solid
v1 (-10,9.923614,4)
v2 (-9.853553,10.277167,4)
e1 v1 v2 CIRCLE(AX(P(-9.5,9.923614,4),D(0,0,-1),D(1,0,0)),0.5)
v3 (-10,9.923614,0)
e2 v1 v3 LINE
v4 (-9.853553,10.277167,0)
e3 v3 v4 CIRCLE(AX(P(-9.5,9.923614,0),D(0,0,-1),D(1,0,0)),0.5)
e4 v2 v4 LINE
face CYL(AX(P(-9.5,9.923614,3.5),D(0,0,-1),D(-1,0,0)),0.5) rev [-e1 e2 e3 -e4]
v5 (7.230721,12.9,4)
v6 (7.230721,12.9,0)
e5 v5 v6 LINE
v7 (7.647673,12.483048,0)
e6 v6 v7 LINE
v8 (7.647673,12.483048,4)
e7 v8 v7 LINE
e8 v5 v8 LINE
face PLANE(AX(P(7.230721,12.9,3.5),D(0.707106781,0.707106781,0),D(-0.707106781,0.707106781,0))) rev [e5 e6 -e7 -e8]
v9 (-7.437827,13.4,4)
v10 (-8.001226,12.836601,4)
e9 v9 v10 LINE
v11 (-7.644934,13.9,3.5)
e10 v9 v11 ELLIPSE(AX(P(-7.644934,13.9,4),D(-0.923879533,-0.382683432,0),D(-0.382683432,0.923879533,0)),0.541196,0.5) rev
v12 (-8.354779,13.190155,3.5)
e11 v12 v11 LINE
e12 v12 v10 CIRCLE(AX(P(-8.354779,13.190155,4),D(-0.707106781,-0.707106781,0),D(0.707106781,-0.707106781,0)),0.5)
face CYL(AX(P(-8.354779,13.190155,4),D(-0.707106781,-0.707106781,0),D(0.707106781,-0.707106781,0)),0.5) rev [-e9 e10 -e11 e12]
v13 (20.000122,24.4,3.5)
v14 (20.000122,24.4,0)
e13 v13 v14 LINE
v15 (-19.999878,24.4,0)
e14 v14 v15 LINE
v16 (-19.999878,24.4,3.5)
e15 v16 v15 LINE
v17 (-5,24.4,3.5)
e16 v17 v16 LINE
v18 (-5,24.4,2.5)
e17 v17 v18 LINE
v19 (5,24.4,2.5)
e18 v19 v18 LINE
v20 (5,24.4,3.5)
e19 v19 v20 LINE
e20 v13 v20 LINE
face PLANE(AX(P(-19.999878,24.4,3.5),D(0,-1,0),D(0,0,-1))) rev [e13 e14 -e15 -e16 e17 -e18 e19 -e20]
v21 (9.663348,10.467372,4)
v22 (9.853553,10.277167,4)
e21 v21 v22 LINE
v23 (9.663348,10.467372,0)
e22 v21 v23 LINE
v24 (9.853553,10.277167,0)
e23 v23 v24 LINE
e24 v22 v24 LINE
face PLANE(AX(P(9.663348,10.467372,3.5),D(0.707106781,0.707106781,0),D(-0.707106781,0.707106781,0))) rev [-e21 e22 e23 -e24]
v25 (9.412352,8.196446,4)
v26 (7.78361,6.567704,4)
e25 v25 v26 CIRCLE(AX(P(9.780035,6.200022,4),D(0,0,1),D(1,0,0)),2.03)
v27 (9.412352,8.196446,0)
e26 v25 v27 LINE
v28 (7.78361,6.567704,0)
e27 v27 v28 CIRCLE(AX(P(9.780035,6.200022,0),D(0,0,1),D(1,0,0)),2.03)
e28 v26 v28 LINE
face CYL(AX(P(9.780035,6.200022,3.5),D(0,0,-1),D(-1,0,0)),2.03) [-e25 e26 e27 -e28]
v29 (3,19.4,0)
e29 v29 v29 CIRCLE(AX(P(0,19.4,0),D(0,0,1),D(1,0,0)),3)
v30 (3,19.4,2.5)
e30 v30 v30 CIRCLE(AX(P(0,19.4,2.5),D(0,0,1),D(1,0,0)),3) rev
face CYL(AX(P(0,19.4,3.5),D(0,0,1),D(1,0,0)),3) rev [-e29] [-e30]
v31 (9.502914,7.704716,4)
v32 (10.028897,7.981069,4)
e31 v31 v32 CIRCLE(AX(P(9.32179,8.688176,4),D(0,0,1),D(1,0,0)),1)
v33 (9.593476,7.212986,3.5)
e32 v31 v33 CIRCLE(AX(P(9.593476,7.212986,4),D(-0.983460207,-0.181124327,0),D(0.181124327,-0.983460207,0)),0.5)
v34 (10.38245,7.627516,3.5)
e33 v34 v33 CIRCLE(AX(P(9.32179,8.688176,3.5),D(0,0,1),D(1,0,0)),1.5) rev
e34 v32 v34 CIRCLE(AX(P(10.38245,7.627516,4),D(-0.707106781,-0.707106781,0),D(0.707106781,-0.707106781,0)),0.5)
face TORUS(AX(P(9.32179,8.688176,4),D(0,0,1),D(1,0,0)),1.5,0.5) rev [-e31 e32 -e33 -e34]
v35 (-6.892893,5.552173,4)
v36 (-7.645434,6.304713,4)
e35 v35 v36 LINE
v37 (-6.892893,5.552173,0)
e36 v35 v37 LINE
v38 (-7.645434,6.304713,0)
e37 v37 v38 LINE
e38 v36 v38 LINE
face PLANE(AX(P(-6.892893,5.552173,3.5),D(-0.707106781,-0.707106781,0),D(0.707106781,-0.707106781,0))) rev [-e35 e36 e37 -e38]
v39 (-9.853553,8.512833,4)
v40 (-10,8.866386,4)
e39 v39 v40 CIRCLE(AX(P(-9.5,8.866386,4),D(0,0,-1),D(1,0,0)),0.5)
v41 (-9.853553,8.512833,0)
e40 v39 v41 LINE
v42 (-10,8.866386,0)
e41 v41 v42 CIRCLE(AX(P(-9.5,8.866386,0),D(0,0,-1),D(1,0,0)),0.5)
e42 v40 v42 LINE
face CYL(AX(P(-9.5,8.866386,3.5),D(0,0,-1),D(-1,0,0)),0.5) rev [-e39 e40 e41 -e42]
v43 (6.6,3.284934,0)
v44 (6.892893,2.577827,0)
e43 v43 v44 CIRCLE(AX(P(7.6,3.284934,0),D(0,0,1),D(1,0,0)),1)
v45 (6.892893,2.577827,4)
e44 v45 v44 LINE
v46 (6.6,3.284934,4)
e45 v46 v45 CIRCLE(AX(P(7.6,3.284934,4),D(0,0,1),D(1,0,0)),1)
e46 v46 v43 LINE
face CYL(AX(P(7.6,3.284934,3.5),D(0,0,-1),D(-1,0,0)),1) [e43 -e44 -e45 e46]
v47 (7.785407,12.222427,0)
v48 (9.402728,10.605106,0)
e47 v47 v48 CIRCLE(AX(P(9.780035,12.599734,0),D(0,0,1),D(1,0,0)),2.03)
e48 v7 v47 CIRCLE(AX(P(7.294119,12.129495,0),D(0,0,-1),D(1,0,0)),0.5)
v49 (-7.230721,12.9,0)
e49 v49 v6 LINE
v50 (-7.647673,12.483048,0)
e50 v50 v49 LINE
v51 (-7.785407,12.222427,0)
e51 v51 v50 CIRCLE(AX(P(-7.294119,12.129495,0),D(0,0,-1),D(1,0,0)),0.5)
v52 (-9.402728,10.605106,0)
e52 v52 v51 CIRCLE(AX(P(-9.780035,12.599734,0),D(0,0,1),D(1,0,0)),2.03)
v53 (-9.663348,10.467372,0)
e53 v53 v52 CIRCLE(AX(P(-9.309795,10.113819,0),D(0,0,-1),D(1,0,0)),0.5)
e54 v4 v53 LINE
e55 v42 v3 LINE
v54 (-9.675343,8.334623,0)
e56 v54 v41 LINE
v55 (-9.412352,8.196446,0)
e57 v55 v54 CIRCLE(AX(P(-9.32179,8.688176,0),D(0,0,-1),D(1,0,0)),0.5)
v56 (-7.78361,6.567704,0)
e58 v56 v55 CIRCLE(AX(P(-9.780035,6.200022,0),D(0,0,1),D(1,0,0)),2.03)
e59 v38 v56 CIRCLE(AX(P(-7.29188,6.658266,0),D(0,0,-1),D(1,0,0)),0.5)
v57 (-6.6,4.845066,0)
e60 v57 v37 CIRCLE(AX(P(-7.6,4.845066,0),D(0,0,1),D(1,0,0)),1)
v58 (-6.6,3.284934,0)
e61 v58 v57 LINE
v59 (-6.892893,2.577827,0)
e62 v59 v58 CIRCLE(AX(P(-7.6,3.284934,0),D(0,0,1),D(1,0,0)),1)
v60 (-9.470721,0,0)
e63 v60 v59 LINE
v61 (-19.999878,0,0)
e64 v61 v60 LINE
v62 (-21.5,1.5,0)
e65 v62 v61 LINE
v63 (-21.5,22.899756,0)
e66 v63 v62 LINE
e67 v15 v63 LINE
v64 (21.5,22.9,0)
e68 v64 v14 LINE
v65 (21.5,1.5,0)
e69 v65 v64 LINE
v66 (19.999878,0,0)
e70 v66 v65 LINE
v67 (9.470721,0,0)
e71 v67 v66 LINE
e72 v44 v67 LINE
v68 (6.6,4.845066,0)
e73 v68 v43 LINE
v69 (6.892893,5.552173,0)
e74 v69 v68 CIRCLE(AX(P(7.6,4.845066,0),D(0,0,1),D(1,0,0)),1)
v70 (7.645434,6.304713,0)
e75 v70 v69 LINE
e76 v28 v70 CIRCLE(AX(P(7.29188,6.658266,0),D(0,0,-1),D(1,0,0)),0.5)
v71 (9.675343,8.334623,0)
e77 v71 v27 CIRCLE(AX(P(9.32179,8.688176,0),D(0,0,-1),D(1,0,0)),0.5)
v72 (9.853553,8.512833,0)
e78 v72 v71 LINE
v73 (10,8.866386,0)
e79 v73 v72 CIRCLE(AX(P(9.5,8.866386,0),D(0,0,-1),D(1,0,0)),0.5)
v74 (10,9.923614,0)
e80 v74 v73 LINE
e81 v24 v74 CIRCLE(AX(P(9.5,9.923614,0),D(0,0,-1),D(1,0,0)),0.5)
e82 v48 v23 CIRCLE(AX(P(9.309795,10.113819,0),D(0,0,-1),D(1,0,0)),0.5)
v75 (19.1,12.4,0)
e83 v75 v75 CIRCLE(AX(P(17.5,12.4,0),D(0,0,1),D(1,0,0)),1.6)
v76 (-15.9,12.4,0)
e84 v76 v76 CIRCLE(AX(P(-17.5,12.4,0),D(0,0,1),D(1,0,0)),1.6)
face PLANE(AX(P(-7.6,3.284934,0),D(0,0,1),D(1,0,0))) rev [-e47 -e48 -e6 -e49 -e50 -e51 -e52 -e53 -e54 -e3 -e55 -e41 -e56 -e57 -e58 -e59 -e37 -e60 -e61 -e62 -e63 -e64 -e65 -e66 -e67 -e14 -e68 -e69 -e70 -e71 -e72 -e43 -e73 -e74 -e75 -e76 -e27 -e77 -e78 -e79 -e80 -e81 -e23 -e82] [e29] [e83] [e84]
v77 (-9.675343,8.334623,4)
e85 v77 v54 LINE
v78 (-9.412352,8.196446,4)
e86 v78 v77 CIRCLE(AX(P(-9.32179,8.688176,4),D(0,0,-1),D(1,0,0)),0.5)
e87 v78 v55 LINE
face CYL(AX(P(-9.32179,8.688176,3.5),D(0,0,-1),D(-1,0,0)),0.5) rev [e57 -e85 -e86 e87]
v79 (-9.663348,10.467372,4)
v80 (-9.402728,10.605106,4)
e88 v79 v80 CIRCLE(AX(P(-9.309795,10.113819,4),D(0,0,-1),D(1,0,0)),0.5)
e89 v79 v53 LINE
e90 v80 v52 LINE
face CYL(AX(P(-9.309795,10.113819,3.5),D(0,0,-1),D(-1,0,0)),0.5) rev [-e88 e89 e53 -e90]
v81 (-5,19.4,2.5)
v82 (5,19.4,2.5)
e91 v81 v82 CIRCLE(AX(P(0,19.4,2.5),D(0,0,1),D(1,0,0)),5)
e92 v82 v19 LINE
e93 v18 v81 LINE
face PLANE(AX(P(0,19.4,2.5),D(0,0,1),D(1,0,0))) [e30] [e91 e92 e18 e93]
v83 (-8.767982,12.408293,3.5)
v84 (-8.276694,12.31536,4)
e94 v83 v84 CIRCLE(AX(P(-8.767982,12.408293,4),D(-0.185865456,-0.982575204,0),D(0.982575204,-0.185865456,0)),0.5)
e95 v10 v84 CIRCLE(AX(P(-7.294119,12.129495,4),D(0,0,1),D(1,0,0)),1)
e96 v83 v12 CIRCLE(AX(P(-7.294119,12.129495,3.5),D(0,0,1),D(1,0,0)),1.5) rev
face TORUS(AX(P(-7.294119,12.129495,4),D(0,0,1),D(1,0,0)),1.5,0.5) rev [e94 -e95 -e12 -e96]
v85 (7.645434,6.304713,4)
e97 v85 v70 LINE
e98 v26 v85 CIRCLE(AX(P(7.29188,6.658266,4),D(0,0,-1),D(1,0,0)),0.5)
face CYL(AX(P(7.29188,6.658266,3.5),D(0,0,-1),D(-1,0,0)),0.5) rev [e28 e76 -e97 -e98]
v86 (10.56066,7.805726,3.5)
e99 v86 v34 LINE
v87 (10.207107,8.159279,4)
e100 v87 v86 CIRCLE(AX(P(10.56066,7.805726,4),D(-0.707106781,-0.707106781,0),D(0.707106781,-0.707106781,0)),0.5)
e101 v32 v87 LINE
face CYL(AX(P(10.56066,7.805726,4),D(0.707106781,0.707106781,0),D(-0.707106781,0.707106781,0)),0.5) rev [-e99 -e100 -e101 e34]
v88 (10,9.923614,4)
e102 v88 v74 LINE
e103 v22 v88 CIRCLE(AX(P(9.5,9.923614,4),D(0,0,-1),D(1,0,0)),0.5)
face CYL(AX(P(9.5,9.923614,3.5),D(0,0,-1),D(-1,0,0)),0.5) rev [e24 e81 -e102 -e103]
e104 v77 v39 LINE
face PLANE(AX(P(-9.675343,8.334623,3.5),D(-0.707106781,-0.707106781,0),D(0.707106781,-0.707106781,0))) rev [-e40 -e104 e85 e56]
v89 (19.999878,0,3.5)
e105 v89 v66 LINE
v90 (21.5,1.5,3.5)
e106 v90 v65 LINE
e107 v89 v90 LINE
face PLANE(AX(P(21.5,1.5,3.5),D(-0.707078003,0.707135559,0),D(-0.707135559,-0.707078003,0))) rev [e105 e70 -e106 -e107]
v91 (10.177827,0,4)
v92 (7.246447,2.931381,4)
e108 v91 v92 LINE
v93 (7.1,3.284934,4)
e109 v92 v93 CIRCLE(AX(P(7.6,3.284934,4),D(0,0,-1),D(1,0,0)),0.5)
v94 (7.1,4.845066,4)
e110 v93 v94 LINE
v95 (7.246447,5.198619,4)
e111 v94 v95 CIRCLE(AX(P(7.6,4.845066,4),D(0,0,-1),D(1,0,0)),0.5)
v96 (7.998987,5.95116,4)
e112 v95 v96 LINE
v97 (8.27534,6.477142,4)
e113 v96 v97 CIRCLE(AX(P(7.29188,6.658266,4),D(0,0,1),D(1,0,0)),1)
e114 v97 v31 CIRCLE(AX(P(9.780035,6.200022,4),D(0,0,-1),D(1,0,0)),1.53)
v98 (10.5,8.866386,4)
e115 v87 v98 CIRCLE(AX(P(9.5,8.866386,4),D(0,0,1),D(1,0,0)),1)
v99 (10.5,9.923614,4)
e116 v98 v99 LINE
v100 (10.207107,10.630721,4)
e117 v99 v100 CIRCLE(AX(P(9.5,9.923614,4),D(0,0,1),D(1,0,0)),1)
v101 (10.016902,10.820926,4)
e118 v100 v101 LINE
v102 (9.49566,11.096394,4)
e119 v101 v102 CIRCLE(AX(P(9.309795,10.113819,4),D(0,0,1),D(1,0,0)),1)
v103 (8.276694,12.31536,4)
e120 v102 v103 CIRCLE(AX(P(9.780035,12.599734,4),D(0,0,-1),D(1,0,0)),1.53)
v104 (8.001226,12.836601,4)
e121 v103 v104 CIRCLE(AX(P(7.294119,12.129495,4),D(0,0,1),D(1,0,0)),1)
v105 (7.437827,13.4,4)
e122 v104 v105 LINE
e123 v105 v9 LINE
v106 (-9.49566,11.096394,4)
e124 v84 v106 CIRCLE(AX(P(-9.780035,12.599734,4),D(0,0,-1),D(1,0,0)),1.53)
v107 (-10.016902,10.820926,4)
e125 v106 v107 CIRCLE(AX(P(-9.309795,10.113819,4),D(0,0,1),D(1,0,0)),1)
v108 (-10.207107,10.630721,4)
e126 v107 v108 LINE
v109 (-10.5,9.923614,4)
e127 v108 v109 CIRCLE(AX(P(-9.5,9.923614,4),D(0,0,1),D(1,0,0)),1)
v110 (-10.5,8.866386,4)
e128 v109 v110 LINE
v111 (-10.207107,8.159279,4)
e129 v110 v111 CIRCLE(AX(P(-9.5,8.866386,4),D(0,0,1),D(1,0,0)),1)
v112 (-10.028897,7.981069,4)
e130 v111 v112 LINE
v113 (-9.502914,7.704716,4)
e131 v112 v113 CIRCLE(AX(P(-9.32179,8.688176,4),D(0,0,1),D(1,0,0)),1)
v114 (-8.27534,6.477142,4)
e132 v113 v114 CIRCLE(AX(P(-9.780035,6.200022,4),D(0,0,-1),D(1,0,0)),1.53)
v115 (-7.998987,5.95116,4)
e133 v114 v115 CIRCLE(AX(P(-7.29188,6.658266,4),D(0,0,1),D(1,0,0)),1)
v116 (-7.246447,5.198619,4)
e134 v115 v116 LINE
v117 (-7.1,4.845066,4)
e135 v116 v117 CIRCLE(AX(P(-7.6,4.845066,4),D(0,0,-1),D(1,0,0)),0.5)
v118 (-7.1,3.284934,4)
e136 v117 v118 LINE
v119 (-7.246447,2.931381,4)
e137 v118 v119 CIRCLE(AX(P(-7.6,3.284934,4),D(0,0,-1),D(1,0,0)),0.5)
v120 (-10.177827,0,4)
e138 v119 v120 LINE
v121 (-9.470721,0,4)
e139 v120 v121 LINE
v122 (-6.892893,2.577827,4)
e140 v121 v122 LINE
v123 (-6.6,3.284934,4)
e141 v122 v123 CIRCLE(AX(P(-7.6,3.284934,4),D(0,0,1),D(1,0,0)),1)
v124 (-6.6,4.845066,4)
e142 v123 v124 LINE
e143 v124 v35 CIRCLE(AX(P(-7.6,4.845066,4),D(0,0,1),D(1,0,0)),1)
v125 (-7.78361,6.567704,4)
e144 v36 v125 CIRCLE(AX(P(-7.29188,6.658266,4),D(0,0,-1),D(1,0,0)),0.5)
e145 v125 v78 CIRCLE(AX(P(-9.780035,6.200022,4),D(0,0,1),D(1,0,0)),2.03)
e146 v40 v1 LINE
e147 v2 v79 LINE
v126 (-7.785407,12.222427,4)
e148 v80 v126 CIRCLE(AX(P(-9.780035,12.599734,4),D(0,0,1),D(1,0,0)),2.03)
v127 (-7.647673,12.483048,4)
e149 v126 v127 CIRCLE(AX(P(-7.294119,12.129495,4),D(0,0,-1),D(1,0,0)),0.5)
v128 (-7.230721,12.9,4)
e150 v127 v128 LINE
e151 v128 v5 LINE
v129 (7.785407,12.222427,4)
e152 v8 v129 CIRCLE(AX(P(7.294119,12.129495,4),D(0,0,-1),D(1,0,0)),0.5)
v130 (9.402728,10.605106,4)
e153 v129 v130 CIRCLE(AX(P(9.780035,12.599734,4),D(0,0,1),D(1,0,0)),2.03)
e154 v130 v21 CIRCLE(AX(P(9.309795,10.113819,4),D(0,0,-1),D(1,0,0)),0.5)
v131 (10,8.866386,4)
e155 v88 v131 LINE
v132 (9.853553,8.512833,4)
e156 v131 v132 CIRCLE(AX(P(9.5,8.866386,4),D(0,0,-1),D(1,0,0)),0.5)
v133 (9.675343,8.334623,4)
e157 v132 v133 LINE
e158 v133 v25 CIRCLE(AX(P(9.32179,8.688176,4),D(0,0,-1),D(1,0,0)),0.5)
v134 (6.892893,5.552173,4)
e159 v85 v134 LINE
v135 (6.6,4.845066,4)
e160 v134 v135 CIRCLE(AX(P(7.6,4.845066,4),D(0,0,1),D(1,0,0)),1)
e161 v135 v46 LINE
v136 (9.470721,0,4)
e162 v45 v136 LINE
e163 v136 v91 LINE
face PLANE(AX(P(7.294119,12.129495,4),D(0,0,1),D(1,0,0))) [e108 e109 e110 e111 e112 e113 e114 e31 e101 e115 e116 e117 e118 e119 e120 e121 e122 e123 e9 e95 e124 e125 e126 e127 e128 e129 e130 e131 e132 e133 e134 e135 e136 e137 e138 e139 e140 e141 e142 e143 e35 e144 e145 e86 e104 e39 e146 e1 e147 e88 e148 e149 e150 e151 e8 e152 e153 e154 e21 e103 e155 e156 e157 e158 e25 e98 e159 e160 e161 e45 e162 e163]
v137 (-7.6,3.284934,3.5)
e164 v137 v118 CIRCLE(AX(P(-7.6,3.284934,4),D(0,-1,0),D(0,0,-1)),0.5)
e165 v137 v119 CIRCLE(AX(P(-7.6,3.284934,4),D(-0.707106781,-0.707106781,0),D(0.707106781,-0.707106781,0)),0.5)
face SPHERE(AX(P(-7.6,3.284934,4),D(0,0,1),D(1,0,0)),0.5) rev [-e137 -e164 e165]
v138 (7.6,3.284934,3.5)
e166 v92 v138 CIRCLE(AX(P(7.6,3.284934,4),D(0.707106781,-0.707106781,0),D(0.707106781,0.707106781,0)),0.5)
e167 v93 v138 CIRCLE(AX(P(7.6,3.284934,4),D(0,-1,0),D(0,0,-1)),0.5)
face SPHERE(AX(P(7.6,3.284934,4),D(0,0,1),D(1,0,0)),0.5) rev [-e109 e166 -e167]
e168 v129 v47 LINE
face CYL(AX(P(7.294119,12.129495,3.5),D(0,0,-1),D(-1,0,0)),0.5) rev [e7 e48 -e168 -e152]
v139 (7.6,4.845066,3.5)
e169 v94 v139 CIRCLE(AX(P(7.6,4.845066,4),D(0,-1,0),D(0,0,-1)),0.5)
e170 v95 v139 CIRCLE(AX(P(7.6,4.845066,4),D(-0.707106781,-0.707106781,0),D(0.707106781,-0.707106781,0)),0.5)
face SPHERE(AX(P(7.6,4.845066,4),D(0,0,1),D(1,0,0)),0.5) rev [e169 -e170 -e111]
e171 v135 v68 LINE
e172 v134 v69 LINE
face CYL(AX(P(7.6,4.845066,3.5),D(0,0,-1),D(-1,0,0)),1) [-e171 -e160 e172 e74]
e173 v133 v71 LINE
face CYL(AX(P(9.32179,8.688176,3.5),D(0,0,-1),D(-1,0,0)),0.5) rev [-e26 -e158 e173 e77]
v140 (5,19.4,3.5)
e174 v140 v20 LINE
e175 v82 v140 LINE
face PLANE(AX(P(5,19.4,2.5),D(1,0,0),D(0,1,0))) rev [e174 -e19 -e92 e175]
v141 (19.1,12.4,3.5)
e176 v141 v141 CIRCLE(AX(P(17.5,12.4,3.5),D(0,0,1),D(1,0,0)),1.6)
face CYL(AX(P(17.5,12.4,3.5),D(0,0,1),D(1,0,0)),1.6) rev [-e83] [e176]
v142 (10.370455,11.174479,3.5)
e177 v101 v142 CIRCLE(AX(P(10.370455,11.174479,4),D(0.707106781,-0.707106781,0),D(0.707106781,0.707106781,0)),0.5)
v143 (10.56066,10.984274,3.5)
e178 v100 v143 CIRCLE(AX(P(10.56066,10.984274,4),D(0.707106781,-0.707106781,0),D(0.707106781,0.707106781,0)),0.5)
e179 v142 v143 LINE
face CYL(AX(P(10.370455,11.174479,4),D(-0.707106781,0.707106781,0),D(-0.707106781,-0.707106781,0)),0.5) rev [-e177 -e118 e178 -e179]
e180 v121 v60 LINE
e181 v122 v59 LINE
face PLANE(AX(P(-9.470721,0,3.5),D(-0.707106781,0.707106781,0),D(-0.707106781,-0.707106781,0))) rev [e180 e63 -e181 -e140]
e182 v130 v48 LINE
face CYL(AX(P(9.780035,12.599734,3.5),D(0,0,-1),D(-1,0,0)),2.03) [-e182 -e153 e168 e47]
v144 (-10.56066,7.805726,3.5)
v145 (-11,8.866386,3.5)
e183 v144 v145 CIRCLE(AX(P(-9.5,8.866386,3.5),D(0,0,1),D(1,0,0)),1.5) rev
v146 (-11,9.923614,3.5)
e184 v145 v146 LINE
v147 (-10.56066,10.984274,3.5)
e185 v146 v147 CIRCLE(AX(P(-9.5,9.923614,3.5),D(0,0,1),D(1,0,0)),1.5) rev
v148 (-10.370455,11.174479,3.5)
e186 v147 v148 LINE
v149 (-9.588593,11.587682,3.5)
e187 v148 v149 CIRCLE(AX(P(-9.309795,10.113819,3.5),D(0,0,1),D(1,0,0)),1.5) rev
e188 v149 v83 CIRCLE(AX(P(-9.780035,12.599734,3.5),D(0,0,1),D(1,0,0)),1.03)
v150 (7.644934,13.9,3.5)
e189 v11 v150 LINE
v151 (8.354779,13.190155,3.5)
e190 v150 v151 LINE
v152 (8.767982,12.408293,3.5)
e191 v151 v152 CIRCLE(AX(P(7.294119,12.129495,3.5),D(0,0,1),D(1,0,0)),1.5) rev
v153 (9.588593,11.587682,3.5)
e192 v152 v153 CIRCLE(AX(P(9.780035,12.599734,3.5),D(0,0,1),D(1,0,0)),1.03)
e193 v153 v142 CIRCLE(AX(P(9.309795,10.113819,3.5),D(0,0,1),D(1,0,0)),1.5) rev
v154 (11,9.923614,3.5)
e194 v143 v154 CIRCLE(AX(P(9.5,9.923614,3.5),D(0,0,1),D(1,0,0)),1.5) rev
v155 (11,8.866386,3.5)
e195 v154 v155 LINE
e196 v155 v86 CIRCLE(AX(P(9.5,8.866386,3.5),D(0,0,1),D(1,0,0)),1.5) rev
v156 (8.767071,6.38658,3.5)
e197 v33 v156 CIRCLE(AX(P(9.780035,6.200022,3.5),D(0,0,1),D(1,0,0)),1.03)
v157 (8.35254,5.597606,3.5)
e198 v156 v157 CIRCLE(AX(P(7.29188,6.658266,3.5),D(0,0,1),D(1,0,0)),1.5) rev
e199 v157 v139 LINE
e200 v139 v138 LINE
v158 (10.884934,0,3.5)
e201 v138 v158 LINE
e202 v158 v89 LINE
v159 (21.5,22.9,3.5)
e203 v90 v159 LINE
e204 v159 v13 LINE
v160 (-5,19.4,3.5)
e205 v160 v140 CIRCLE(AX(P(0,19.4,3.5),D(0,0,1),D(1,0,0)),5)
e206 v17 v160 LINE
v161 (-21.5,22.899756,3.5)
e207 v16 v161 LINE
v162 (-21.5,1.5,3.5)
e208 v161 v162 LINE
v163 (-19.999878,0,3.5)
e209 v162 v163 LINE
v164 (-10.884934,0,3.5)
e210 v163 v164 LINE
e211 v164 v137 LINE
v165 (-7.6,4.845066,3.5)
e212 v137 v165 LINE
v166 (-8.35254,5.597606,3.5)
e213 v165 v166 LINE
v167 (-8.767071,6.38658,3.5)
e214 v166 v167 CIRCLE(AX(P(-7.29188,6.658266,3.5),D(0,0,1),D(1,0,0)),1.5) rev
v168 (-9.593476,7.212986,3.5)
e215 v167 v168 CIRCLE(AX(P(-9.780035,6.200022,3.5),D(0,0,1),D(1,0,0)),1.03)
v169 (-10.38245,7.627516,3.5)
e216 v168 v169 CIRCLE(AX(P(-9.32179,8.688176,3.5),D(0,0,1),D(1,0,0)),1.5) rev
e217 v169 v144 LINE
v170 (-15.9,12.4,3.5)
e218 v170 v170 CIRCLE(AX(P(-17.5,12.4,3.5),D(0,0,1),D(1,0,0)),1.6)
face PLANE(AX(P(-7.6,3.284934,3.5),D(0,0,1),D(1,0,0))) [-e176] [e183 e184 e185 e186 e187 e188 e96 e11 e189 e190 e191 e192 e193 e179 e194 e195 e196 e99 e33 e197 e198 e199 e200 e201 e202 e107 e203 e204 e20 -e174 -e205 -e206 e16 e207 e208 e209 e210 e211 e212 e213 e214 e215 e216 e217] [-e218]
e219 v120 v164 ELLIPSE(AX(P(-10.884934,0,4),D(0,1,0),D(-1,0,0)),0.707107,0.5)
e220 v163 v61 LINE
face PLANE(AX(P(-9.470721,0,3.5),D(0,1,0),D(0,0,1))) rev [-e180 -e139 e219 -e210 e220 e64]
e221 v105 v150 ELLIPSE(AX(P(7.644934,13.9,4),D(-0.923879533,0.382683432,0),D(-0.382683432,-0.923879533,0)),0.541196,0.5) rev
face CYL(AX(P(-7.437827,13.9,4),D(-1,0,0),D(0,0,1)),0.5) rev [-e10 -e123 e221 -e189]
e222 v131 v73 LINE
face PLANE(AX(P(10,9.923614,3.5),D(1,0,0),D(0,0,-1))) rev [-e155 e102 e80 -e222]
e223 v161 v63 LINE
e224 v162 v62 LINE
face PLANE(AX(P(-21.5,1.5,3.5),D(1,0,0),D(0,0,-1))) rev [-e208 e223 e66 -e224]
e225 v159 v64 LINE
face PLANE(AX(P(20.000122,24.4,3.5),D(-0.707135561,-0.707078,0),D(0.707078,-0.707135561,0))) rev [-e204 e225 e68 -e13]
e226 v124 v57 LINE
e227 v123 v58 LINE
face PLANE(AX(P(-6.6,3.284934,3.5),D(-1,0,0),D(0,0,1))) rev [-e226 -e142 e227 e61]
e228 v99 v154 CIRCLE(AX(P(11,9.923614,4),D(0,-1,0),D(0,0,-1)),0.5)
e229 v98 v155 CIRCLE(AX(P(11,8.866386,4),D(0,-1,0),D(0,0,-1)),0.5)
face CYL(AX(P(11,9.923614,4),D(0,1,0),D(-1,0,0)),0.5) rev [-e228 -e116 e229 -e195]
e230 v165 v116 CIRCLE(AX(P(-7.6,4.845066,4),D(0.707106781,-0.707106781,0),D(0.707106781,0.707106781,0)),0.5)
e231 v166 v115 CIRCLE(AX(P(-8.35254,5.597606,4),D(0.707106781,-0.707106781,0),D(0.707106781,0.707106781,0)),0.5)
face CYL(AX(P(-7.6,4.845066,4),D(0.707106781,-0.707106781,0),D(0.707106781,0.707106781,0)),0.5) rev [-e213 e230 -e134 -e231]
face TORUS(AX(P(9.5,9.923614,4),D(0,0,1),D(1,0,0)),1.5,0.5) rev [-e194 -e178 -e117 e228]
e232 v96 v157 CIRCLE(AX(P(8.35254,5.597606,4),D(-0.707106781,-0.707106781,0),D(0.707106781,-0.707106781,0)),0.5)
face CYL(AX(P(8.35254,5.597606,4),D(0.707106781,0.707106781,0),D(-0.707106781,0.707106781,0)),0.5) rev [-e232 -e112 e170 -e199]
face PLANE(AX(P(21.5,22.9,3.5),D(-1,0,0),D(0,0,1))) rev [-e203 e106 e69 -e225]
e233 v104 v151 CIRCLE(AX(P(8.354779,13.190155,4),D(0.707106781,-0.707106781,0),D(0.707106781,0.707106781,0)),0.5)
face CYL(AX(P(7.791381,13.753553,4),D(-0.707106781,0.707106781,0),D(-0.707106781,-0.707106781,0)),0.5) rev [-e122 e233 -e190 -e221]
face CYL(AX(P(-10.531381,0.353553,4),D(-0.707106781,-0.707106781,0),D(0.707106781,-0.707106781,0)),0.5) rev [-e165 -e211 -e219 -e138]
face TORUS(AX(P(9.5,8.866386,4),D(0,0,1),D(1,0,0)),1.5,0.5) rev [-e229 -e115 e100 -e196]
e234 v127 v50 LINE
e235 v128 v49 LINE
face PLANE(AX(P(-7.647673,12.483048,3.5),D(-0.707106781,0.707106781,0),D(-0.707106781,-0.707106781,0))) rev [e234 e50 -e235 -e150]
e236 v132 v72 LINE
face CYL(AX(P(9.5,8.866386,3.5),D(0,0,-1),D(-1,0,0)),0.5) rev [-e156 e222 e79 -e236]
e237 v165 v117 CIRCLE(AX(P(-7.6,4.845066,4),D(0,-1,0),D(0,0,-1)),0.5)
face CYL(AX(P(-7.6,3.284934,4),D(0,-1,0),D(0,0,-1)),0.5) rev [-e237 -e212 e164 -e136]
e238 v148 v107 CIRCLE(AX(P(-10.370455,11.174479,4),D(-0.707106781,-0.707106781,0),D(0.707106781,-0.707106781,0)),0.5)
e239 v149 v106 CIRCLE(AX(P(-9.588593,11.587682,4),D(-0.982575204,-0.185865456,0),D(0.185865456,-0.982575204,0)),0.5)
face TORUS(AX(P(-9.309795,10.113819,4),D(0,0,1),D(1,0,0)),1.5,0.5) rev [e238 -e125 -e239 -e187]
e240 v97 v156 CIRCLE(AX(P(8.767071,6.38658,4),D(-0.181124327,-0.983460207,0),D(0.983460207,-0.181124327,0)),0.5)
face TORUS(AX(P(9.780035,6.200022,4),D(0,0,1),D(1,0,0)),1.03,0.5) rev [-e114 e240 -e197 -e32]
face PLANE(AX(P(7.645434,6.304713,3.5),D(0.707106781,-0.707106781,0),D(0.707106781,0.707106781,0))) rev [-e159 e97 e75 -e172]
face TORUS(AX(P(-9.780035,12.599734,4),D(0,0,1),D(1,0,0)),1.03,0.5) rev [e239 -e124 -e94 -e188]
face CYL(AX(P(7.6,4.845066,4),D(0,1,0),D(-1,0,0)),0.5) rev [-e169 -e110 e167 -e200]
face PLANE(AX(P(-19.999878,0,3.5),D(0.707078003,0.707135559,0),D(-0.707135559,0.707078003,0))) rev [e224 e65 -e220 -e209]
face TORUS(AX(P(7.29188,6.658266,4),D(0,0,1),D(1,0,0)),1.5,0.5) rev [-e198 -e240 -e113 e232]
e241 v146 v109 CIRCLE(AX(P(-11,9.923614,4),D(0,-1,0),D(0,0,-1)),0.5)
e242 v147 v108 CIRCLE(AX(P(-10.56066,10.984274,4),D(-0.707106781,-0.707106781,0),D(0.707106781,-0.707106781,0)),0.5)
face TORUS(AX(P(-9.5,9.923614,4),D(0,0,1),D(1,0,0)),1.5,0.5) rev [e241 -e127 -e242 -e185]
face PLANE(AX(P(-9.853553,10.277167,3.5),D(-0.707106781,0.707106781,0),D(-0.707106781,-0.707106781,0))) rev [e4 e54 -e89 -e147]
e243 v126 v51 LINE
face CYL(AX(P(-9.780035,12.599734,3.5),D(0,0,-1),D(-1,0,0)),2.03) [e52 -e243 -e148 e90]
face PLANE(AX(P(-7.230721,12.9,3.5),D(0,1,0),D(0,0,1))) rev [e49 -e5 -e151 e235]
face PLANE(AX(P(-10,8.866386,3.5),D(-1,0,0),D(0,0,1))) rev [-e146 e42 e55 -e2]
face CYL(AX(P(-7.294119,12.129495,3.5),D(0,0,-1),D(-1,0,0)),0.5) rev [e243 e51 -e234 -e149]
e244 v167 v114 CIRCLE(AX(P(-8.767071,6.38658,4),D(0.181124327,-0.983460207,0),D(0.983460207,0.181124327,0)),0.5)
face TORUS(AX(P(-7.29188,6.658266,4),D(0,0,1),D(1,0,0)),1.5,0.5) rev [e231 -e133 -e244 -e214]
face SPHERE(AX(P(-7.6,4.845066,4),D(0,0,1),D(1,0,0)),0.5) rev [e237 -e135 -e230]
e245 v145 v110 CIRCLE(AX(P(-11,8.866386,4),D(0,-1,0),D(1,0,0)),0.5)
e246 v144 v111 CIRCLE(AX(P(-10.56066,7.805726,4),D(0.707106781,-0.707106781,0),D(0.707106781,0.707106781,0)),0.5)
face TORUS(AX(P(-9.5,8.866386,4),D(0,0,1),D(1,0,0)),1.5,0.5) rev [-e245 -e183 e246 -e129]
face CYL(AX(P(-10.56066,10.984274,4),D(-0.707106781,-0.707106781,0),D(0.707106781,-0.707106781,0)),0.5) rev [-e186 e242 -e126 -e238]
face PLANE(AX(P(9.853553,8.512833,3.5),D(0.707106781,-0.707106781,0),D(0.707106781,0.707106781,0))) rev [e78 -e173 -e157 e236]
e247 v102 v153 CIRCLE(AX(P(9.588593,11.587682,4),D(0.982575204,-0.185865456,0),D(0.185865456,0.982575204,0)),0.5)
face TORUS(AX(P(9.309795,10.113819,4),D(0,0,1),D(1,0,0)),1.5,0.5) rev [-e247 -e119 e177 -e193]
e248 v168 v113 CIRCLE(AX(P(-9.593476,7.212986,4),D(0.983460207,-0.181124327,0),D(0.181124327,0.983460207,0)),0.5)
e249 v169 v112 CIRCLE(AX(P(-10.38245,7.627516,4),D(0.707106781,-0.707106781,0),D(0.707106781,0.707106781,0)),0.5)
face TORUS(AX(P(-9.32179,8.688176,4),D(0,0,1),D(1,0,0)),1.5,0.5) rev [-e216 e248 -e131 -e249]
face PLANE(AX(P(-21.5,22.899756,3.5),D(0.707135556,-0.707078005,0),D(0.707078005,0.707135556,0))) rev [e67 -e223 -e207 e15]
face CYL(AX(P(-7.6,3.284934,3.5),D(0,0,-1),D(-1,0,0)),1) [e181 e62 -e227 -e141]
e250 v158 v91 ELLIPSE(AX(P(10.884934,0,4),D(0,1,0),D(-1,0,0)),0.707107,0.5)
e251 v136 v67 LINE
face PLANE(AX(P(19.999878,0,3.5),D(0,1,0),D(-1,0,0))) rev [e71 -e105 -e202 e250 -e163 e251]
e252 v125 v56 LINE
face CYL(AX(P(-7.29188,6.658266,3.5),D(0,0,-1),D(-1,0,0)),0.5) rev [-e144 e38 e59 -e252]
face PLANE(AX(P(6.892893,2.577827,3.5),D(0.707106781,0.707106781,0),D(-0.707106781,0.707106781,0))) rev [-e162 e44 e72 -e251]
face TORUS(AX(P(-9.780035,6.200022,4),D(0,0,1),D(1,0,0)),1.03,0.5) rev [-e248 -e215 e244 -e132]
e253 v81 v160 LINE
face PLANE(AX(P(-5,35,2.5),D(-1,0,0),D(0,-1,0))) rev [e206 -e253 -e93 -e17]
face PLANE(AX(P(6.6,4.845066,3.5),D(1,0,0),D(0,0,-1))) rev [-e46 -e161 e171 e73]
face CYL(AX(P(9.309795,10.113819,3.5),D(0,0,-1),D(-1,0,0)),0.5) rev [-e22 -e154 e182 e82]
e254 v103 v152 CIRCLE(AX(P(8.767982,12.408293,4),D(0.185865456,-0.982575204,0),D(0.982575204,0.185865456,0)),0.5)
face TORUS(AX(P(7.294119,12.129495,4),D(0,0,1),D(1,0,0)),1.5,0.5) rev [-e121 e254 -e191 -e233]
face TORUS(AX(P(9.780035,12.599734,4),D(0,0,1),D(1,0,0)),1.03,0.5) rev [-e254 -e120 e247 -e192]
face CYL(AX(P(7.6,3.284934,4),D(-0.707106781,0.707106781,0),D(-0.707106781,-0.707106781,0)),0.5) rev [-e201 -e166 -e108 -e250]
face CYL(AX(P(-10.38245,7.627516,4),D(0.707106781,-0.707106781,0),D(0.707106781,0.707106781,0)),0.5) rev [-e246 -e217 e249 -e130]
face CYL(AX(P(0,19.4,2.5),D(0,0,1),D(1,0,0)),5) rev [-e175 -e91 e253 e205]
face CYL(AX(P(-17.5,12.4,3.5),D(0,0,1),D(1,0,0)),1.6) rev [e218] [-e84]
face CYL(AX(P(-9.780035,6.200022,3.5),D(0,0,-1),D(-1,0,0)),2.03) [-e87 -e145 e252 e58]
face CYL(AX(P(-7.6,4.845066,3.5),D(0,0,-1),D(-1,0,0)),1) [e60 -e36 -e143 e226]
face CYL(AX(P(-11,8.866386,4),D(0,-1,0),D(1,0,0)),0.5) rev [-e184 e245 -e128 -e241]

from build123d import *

# Parameters (mm, degrees)
ENDSEAL_1_DEPTH              = 3.5
BOSS_EXTRUDE1_DEPTH          = 0.5
FILLET1_R                    = 0.5
F_6_0_6_DIAMETER_HOLE1_D     = 6
F_6_0_6_DIAMETER_HOLE1_DEPTH = 12.5
F_6_0_6_DIAMETER_HOLE1_TIP   = 1.561701152
CUT_EXTRUDE2_DEPTH           = 1
F_3_2_3_2_DIAMETER_HOLE1_D   = 3.2


with BuildPart() as part:
    # Sketch4 → Endseal 1 (new body)
    with BuildSketch(Plane.XY):
        with BuildLine():
            Line((-7.230720611, 12.9), (7.230720611, 12.9))
            Line((7.230720611, 12.9), (7.647672674, 12.483047938))
            ThreePointArc((7.647672674, 12.483047938), (7.736182466, 12.363118479), (7.785406885, 12.222427275))
            ThreePointArc((7.785406885, 12.222427275), (8.344607784, 11.164307384), (9.402727675, 10.605106485))
            ThreePointArc((9.402727675, 10.605106485), (9.54341888, 10.555882066), (9.663348338, 10.467372274))
            Line((9.663348338, 10.467372274), (9.853553391, 10.277167221))
            ThreePointArc((9.853553391, 10.277167221), (9.961939766, 10.114955546), (10, 9.92361383))
            Line((10, 9.92361383), (10, 8.86638617))
            ThreePointArc((10, 8.86638617), (9.961939766, 8.675044454), (9.853553391, 8.512832779))
            Line((9.853553391, 8.512832779), (9.675343394, 8.334622782))
            ThreePointArc((9.675343394, 8.334622782), (9.554347216, 8.245550888), (9.412352167, 8.19644607))
            ThreePointArc((9.412352167, 8.19644607), (8.344607784, 7.635448616), (7.783610331, 6.567704234))
            ThreePointArc((7.783610331, 6.567704234), (7.734505512, 6.425709184), (7.645433618, 6.304713007))
            Line((7.645433618, 6.304713007), (6.892893219, 5.552172608))
            ThreePointArc((6.892893219, 5.552172608), (6.676120468, 5.227749259), (6.6, 4.845065826))
            Line((6.6, 4.845065826), (6.6, 3.284934173))
            ThreePointArc((6.6, 3.284934173), (6.676120468, 2.902250741), (6.892893219, 2.577827392))
            Line((6.892893219, 2.577827392), (9.470720611, 0))
            Line((9.470720611, 0), (19.9998779, 0))
            Line((19.9998779, 0), (21.5, 1.5))
            Line((21.5, 1.5), (21.5, 22.9))
            Line((21.5, 22.9), (20.0001221, 24.4))
            Line((20.0001221, 24.4), (-19.9998779, 24.4))
            Line((-19.9998779, 24.4), (-21.5, 22.8997558))
            Line((-21.5, 22.8997558), (-21.5, 1.5))
            Line((-21.5, 1.5), (-19.9998779, 0))
            Line((-19.9998779, 0), (-9.470720611, 0))
            Line((-9.470720611, 0), (-6.892893219, 2.577827392))
            ThreePointArc((-6.892893219, 2.577827392), (-6.676120468, 2.902250741), (-6.6, 3.284934173))
            Line((-6.6, 3.284934173), (-6.6, 4.845065826))
            ThreePointArc((-6.6, 4.845065826), (-6.676120468, 5.227749259), (-6.892893219, 5.552172608))
            Line((-6.892893219, 5.552172608), (-7.645433618, 6.304713006))
            ThreePointArc((-7.645433618, 6.304713006), (-7.734505512, 6.425709184), (-7.783610331, 6.567704233))
            ThreePointArc((-7.783610331, 6.567704233), (-8.344607784, 7.635448616), (-9.412352167, 8.19644607))
            ThreePointArc((-9.412352167, 8.19644607), (-9.554347216, 8.245550888), (-9.675343394, 8.334622782))
            Line((-9.675343394, 8.334622782), (-9.853553391, 8.512832779))
            ThreePointArc((-9.853553391, 8.512832779), (-9.961939766, 8.675044454), (-10, 8.86638617))
            Line((-10, 8.86638617), (-10, 9.92361383))
            ThreePointArc((-10, 9.92361383), (-9.961939766, 10.114955546), (-9.853553391, 10.277167221))
            Line((-9.853553391, 10.277167221), (-9.663348338, 10.467372274))
            ThreePointArc((-9.663348338, 10.467372274), (-9.543418879, 10.555882066), (-9.402727675, 10.605106485))
            ThreePointArc((-9.402727675, 10.605106485), (-8.344607784, 11.164307384), (-7.785406885, 12.222427275))
            ThreePointArc((-7.785406885, 12.222427275), (-7.736182466, 12.363118479), (-7.647672674, 12.483047938))
            Line((-7.647672674, 12.483047938), (-7.230720611, 12.9))
        make_face()
    extrude(amount=ENDSEAL_1_DEPTH)

    # Sketch6 → Boss-Extrude1 (add)
    with BuildSketch(Plane.XY.offset(3.5)):
        with BuildLine():
            Line((-10.177827392, 0), (-7.24644661, 2.931380783))
            ThreePointArc((-7.24644661, 2.931380783), (-7.138060234, 3.093592457), (-7.1, 3.284934173))
            Line((-7.1, 3.284934173), (-7.1, 4.845065826))
            ThreePointArc((-7.1, 4.845065826), (-7.138060234, 5.036407542), (-7.24644661, 5.198619217))
            Line((-7.24644661, 5.198619217), (-7.998987008, 5.951159616))
            ThreePointArc((-7.998987008, 5.951159616), (-8.177130797, 6.193151971), (-8.275340434, 6.47714207))
            ThreePointArc((-8.275340434, 6.47714207), (-8.698161175, 7.281895225), (-9.50291433, 7.704715966))
            ThreePointArc((-9.50291433, 7.704715966), (-9.786904429, 7.802925603), (-10.028896784, 7.981069392))
            Line((-10.028896784, 7.981069392), (-10.207106781, 8.159279389))
            ThreePointArc((-10.207106781, 8.159279389), (-10.423879533, 8.483702737), (-10.5, 8.86638617))
            Line((-10.5, 8.86638617), (-10.5, 9.92361383))
            ThreePointArc((-10.5, 9.92361383), (-10.423879533, 10.306297262), (-10.207106781, 10.630720611))
            Line((-10.207106781, 10.630720611), (-10.016901728, 10.820925664))
            ThreePointArc((-10.016901728, 10.820925664), (-9.777042812, 10.99794525), (-9.495660403, 11.096394087))
            ThreePointArc((-9.495660403, 11.096394087), (-8.698161175, 11.517860775), (-8.276694487, 12.315360003))
            ThreePointArc((-8.276694487, 12.315360003), (-8.17824565, 12.596742412), (-8.001226064, 12.836601328))
            Line((-8.001226064, 12.836601328), (-7.437827392, 13.4))
            Line((-7.437827392, 13.4), (7.437827392, 13.4))
            Line((7.437827392, 13.4), (8.001226064, 12.836601328))
            ThreePointArc((8.001226064, 12.836601328), (8.17824565, 12.596742412), (8.276694487, 12.315360003))
            ThreePointArc((8.276694487, 12.315360003), (8.698161175, 11.517860775), (9.495660403, 11.096394087))
            ThreePointArc((9.495660403, 11.096394087), (9.777042812, 10.99794525), (10.016901728, 10.820925664))
            Line((10.016901728, 10.820925664), (10.207106781, 10.630720611))
            ThreePointArc((10.207106781, 10.630720611), (10.423879533, 10.306297262), (10.5, 9.92361383))
            Line((10.5, 9.92361383), (10.5, 8.86638617))
            ThreePointArc((10.5, 8.86638617), (10.423879533, 8.483702738), (10.207106781, 8.159279389))
            Line((10.207106781, 8.159279389), (10.028896784, 7.981069392))
            ThreePointArc((10.028896784, 7.981069392), (9.786904429, 7.802925604), (9.50291433, 7.704715966))
            ThreePointArc((9.50291433, 7.704715966), (8.698161175, 7.281895225), (8.275340434, 6.47714207))
            ThreePointArc((8.275340434, 6.47714207), (8.177130797, 6.193151971), (7.998987008, 5.951159616))
            Line((7.998987008, 5.951159616), (7.24644661, 5.198619217))
            ThreePointArc((7.24644661, 5.198619217), (7.138060234, 5.036407543), (7.1, 4.845065826))
            Line((7.1, 4.845065826), (7.1, 3.284934173))
            ThreePointArc((7.1, 3.284934173), (7.138060234, 3.093592457), (7.24644661, 2.931380783))
            Line((7.24644661, 2.931380783), (10.177827392, 0))
            Line((10.177827392, 0), (9.470720611, 0))
            Line((9.470720611, 0), (6.892893219, 2.577827392))
            ThreePointArc((6.892893219, 2.577827392), (6.676120468, 2.902250741), (6.6, 3.284934173))
            Line((6.6, 3.284934173), (6.6, 4.845065826))
            ThreePointArc((6.6, 4.845065826), (6.676120468, 5.227749259), (6.892893219, 5.552172608))
            Line((6.892893219, 5.552172608), (7.645433618, 6.304713007))
            ThreePointArc((7.645433618, 6.304713007), (7.734505512, 6.425709184), (7.783610331, 6.567704234))
            ThreePointArc((7.783610331, 6.567704234), (8.344607784, 7.635448616), (9.412352167, 8.19644607))
            ThreePointArc((9.412352167, 8.19644607), (9.554347216, 8.245550888), (9.675343394, 8.334622782))
            Line((9.675343394, 8.334622782), (9.853553391, 8.512832779))
            ThreePointArc((9.853553391, 8.512832779), (9.961939766, 8.675044454), (10, 8.86638617))
            Line((10, 8.86638617), (10, 9.92361383))
            ThreePointArc((10, 9.92361383), (9.961939766, 10.114955546), (9.853553391, 10.277167221))
            Line((9.853553391, 10.277167221), (9.663348338, 10.467372274))
            ThreePointArc((9.663348338, 10.467372274), (9.54341888, 10.555882066), (9.402727675, 10.605106485))
            ThreePointArc((9.402727675, 10.605106485), (8.344607784, 11.164307384), (7.785406885, 12.222427275))
            ThreePointArc((7.785406885, 12.222427275), (7.736182466, 12.363118479), (7.647672674, 12.483047938))
            Line((7.647672674, 12.483047938), (7.230720611, 12.9))
            Line((7.230720611, 12.9), (-7.230720611, 12.9))
            Line((-7.230720611, 12.9), (-7.647672674, 12.483047938))
            ThreePointArc((-7.647672674, 12.483047938), (-7.736182466, 12.363118479), (-7.785406885, 12.222427275))
            ThreePointArc((-7.785406885, 12.222427275), (-8.344607784, 11.164307384), (-9.402727675, 10.605106485))
            ThreePointArc((-9.402727675, 10.605106485), (-9.543418879, 10.555882066), (-9.663348338, 10.467372274))
            Line((-9.663348338, 10.467372274), (-9.853553391, 10.277167221))
            ThreePointArc((-9.853553391, 10.277167221), (-9.961939766, 10.114955546), (-10, 9.92361383))
            Line((-10, 9.92361383), (-10, 8.86638617))
            ThreePointArc((-10, 8.86638617), (-9.961939766, 8.675044454), (-9.853553391, 8.512832779))
            Line((-9.853553391, 8.512832779), (-9.675343394, 8.334622782))
            ThreePointArc((-9.675343394, 8.334622782), (-9.554347216, 8.245550888), (-9.412352167, 8.19644607))
            ThreePointArc((-9.412352167, 8.19644607), (-8.344607784, 7.635448616), (-7.783610331, 6.567704233))
            ThreePointArc((-7.783610331, 6.567704233), (-7.734505512, 6.425709184), (-7.645433618, 6.304713006))
            Line((-7.645433618, 6.304713006), (-6.892893219, 5.552172608))
            ThreePointArc((-6.892893219, 5.552172608), (-6.676120468, 5.227749259), (-6.6, 4.845065826))
            Line((-6.6, 4.845065826), (-6.6, 3.284934173))
            ThreePointArc((-6.6, 3.284934173), (-6.676120468, 2.902250741), (-6.892893219, 2.577827392))
            Line((-6.892893219, 2.577827392), (-9.470720611, 0))
            Line((-9.470720611, 0), (-10.177827392, 0))
        make_face()
    extrude(amount=BOSS_EXTRUDE1_DEPTH)

    # Fillet1
    fillet1_edges = [part.edges().sort_by_distance(p)[0] for p in [
        (-7.719526728, 13.118300664, 3.5),
        (-8.17824565, 12.596742412, 3.5),
        (-8.698161175, 11.517860775, 3.5),
        (-9.777042812, 10.99794525, 3.5),
        (-10.112004255, 10.725823138, 3.5),
        (-10.423879533, 10.306297262, 3.5),
        (-10.5, 9.395, 3.5),
        (-10.423879533, 8.483702737, 3.5),
        (-10.118001783, 8.07017439, 3.5),
        (-9.786904429, 7.802925603, 3.5),
        (-8.698161175, 7.281895225, 3.5),
        (-8.177130797, 6.193151971, 3.5),
        (-7.622716809, 5.574889416, 3.5),
        (-7.138060234, 5.036407542, 3.5),
        (-7.1, 4.065, 3.5),
        (-7.138060234, 3.093592457, 3.5),
        (7.719526728, 13.118300664, 3.5),
        (8.17824565, 12.596742412, 3.5),
        (8.698161175, 11.517860775, 3.5),
        (9.777042812, 10.99794525, 3.5),
        (10.112004255, 10.725823138, 3.5),
        (10.423879533, 10.306297262, 3.5),
        (10.5, 9.395, 3.5),
        (10.423879533, 8.483702738, 3.5),
        (10.118001783, 8.07017439, 3.5),
        (9.786904429, 7.802925604, 3.5),
        (8.698161175, 7.281895225, 3.5),
        (8.177130797, 6.193151971, 3.5),
        (7.622716809, 5.574889417, 3.5),
        (7.138060234, 5.036407543, 3.5),
        (7.1, 4.065, 3.5),
        (7.138060234, 3.093592457, 3.5),
        (-8.712137001, 1.465690391, 3.5),
        (0, 13.4, 3.5),
        (8.712137001, 1.465690391, 3.5),
    ]]
    fillet(fillet1_edges, radius=FILLET1_R - 0.0001)  # a hair under: the kernel refuses the full size

    # Ø6.0 (6) Diameter Hole1
    with Locations(Plane.XY.offset(3.5)):
        with Locations((0, 19.4)):
            Hole(F_6_0_6_DIAMETER_HOLE1_D / 2, depth=F_6_0_6_DIAMETER_HOLE1_DEPTH)
            with Locations((0, 0, -(F_6_0_6_DIAMETER_HOLE1_DEPTH + F_6_0_6_DIAMETER_HOLE1_TIP / 2))):  # 125° drill point
                Cone(0, F_6_0_6_DIAMETER_HOLE1_D / 2, F_6_0_6_DIAMETER_HOLE1_TIP, mode=Mode.SUBTRACT)

    # Sketch9 → Cut-Extrude2 (cut)
    with BuildSketch(Plane.XY.offset(3.5)):
        with BuildLine():
            Line((5, 19.4), (5, 35))
            Line((5, 35), (-5, 35))
            Line((-5, 35), (-5, 19.4))
            ThreePointArc((-5, 19.4), (0, 14.4), (5, 19.4))
        make_face()
    extrude(amount=-CUT_EXTRUDE2_DEPTH, mode=Mode.SUBTRACT)

    # Ø3.2 (3.2) Diameter Hole1 (through all)
    with Locations(Plane.XY.offset(3.5)):
        with Locations((-17.5, 12.4), (17.5, 12.4)):
            Hole(F_3_2_3_2_DIAMETER_HOLE1_D / 2)


solid = part.part
